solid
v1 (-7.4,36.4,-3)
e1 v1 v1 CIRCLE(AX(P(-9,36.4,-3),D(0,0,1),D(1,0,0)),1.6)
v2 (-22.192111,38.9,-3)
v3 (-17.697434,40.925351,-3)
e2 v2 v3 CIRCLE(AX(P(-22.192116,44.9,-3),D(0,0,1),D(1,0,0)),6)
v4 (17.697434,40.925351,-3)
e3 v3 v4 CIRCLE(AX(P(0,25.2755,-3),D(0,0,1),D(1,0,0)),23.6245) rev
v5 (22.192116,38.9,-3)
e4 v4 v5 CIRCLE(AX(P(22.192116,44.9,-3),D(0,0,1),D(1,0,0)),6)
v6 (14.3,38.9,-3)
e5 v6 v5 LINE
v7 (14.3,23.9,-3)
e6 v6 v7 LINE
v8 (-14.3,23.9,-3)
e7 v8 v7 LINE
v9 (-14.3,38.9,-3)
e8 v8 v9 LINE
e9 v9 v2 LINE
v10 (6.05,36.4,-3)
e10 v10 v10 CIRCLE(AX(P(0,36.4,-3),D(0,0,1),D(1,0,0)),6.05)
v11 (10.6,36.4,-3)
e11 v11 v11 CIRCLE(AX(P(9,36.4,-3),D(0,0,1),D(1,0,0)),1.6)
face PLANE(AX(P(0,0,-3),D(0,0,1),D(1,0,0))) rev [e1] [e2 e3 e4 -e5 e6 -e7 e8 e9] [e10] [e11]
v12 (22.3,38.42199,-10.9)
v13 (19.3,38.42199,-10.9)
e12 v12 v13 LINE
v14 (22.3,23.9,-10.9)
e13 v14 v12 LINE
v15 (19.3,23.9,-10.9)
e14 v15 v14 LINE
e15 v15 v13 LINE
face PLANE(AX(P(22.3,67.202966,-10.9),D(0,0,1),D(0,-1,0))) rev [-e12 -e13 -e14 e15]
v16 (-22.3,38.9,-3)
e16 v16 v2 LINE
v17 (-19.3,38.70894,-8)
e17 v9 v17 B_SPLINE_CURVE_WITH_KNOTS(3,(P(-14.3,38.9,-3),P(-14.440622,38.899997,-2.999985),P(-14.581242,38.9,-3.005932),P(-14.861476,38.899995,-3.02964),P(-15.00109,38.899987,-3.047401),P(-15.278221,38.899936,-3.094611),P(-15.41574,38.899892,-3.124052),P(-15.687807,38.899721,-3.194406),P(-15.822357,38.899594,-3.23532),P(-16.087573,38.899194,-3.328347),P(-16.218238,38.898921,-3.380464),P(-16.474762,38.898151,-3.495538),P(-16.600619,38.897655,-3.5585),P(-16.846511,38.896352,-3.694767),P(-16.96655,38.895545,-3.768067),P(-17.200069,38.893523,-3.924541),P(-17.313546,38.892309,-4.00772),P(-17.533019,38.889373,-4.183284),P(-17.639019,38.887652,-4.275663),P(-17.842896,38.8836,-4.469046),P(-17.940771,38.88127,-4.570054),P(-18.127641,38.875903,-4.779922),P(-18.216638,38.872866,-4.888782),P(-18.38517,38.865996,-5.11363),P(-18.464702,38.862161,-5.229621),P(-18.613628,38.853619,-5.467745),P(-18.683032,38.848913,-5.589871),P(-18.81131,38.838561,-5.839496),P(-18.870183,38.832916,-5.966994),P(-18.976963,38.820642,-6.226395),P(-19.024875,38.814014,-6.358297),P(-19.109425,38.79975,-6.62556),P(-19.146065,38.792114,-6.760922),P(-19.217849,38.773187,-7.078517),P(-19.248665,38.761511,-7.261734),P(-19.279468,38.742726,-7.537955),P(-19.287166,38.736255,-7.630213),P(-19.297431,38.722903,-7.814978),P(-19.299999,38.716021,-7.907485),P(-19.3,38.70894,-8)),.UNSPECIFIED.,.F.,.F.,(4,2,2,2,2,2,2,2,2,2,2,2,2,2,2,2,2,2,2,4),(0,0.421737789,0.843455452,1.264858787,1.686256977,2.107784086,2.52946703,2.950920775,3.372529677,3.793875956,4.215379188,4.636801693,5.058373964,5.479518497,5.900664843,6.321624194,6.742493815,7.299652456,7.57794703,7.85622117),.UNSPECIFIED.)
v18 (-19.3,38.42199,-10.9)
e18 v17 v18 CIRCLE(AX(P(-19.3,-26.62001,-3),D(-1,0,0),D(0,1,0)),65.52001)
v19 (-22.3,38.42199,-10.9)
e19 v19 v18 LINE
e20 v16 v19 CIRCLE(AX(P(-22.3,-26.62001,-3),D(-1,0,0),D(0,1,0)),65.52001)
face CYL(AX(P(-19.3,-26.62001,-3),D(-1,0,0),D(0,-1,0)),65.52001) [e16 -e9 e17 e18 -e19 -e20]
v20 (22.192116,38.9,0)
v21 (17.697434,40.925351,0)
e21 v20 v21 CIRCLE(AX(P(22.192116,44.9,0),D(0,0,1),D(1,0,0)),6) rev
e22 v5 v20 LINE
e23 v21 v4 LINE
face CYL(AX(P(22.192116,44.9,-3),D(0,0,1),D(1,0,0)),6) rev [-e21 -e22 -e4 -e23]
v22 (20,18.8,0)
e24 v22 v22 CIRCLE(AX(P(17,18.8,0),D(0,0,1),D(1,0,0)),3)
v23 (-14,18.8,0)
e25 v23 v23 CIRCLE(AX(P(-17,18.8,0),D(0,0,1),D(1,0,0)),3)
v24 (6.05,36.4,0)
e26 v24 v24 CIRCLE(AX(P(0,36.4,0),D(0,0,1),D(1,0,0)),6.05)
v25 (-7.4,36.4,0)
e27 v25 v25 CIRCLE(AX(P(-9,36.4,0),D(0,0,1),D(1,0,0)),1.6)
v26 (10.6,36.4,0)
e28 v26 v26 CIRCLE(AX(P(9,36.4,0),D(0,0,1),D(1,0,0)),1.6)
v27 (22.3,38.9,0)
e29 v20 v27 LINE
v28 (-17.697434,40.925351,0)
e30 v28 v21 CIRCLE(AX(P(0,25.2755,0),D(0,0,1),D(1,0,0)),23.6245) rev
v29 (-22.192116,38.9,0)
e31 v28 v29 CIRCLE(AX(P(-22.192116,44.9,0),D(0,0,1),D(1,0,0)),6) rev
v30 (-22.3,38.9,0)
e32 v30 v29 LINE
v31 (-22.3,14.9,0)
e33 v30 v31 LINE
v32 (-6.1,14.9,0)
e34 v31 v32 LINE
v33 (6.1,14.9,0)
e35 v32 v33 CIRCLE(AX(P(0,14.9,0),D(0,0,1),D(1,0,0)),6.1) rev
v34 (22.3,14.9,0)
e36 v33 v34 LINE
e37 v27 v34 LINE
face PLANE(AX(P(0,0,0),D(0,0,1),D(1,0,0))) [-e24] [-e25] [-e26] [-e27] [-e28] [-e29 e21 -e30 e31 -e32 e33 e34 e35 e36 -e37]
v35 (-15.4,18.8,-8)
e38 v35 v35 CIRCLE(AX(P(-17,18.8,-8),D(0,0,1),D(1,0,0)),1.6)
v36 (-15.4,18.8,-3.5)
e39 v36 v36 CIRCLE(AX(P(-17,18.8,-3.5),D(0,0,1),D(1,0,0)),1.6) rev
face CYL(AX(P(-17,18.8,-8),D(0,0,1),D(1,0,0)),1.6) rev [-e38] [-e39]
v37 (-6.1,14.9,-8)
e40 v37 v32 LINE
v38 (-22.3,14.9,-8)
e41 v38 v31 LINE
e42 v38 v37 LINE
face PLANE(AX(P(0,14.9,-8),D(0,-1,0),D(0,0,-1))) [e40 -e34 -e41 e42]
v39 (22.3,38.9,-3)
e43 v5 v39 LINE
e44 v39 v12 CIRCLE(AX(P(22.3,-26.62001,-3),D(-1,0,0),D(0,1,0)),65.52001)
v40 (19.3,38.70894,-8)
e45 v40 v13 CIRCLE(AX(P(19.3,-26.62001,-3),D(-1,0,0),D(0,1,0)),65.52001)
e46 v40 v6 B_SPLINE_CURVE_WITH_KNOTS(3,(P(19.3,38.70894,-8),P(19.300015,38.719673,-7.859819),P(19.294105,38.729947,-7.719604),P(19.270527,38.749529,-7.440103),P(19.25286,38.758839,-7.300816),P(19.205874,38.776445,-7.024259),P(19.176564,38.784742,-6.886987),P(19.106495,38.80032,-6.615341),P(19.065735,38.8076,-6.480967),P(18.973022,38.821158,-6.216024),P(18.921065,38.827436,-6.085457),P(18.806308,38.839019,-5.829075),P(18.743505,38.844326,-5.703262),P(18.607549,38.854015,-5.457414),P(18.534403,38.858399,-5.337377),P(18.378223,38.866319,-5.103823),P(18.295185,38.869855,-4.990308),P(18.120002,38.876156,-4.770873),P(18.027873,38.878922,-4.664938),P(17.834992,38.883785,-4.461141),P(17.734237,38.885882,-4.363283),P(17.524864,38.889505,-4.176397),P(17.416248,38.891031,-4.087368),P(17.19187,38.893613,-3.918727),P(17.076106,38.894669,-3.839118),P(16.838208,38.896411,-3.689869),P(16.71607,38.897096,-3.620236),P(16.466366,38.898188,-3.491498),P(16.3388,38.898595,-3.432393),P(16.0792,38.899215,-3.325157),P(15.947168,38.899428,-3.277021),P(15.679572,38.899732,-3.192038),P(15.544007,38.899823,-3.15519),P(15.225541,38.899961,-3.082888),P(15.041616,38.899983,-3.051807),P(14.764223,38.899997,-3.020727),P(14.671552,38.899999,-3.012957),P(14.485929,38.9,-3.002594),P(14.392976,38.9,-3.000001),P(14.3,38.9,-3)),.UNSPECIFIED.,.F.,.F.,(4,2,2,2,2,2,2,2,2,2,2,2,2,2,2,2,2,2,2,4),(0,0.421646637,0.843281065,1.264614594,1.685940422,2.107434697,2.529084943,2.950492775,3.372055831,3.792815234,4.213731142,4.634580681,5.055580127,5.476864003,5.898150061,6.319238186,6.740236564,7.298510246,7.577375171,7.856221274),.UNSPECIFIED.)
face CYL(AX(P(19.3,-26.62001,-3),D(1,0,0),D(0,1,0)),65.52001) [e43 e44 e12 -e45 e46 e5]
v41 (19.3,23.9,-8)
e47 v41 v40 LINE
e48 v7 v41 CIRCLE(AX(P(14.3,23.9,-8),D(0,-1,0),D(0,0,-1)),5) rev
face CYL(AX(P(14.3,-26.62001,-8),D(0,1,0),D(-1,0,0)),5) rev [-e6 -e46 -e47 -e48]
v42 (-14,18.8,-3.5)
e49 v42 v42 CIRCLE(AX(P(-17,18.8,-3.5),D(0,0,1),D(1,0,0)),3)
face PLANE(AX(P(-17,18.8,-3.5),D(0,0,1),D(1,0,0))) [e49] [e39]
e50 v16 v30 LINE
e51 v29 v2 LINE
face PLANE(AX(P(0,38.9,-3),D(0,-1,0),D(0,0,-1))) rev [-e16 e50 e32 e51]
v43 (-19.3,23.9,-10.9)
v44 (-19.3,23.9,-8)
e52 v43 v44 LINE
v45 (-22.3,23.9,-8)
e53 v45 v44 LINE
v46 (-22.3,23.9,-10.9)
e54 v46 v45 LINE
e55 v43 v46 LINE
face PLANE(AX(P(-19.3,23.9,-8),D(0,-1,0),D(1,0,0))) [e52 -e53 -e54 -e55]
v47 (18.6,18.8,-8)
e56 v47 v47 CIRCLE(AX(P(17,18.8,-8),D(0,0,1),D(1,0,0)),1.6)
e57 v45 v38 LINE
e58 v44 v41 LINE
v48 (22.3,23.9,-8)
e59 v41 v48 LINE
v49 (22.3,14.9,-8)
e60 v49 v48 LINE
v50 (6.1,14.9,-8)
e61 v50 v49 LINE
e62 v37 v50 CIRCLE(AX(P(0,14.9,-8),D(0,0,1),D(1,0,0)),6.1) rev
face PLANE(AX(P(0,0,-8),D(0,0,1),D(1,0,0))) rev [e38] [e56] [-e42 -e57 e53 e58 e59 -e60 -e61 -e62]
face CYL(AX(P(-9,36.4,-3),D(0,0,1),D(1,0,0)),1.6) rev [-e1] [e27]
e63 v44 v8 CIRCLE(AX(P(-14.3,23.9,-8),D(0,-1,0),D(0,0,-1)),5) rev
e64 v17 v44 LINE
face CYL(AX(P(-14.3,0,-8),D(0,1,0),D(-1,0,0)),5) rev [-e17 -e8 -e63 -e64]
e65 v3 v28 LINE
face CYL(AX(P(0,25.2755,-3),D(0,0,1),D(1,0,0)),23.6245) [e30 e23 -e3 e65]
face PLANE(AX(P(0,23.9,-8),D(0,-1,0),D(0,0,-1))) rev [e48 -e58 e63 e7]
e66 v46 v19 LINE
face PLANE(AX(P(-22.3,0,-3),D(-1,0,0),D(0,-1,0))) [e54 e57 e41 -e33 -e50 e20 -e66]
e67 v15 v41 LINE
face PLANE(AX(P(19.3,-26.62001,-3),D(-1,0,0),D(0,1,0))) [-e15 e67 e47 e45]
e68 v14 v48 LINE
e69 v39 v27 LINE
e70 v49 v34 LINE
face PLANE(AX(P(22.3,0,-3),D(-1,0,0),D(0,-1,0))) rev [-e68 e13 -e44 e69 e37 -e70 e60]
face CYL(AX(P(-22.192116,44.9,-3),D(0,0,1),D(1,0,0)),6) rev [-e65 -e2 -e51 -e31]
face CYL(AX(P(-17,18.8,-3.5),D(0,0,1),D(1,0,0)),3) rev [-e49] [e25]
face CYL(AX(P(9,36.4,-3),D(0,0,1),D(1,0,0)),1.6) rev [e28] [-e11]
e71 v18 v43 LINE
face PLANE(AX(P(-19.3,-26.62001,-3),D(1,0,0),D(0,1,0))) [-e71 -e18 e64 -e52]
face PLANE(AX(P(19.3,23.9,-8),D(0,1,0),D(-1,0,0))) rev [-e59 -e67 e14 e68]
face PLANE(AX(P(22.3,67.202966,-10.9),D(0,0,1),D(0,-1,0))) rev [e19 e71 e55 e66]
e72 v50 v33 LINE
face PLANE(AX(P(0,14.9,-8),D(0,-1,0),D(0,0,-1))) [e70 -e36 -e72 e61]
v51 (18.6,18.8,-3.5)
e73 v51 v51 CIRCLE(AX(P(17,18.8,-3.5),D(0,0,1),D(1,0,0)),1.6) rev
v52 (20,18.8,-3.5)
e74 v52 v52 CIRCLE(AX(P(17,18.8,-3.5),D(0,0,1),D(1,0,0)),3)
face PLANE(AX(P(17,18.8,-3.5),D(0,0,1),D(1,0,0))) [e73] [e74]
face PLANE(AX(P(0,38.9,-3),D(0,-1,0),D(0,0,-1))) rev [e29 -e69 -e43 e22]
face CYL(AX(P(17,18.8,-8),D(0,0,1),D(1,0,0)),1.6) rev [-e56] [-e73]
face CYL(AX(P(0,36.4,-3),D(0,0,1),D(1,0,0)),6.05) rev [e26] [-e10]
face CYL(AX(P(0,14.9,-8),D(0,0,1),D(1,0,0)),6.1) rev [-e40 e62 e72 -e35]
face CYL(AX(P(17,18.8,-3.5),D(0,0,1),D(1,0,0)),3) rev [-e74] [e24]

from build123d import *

# Parameters (mm, degrees)
SKETCH_2_R          = 6.05
SKETCH_2_R_2        = 1.6
EXTRUDE_1_DEPTH     = 3
SKETCH_2_3_R        = 1.6
EXTRUDE_2_DEPTH     = 8
SKETCH_3_R          = 1.65
EXTRUDE_4_DEPTH     = 3
SKETCH_5_R          = 3
CUT_EXTRUDE_1_DEPTH = 3.5
SKETCH_6_W          = 55.305281636
SKETCH_6_H          = 51.082077229
CUT_EXTRUDE_2_DEPTH = 82.174934555
FILLET_10_R         = 6
FILLET_11_R         = 5


with BuildPart() as part:
    # ｽｹｯﾁ2 → ﾎﾞｽ - 押し出し1 (new body)
    with BuildSketch(Plane.XY):
        with BuildLine():
            Line((-22.3, 23.9), (22.3, 23.9))
            Line((22.3, 23.9), (22.3, 38.9))
            Line((22.3, 38.9), (19.3, 38.9))
            ThreePointArc((19.3, 38.9), (0, 48.9), (-19.3, 38.9))
            Line((-19.3, 38.9), (-22.3, 38.9))
            Line((-22.3, 38.9), (-22.3, 23.9))
        make_face()
        with Locations((0, 36.4)):
            Circle(SKETCH_2_R, mode=Mode.SUBTRACT)
        with Locations((-9, 36.4)):
            Circle(SKETCH_2_R_2, mode=Mode.SUBTRACT)
        with Locations((9, 36.4)):
            Circle(SKETCH_2_R_2, mode=Mode.SUBTRACT)
    extrude(amount=-EXTRUDE_1_DEPTH)

    # ｽｹｯﾁ2<3> → ﾎﾞｽ - 押し出し2 (add)
    with BuildSketch(Plane.XY):
        with BuildLine():
            Line((22.3, 23.9), (-22.3, 23.9))
            Line((-22.3, 23.9), (-22.3, 14.9))
            Line((-22.3, 14.9), (-6.1, 14.9))
            ThreePointArc((-6.1, 14.9), (0, 21), (6.1, 14.9))
            Line((6.1, 14.9), (22.3, 14.9))
            Line((22.3, 14.9), (22.3, 23.9))
        make_face()
        with Locations((-17, 18.8)):
            Circle(SKETCH_2_3_R, mode=Mode.SUBTRACT)
        with Locations((17, 18.8)):
            Circle(SKETCH_2_3_R, mode=Mode.SUBTRACT)
    extrude(amount=-EXTRUDE_2_DEPTH)

    # ｽｹｯﾁ3 → ﾎﾞｽ - 押し出し4 (add)
    with BuildSketch(Plane.ZY.offset(22.3)):
        with BuildLine():
            Line((-8, 23.9), (-10.9, 23.9))
            Line((-10.9, 23.9), (-10.9, 16.120888862))
            Line((-10.9, 16.120888862), (-43, 16.120888862))
            ThreePointArc((-43, 16.120888862), (-46.752084661, 18.734576957), (-45.600779817, 23.159958513))
            ThreePointArc((-45.600779817, 23.159958513), (-25.707792424, 34.839146133), (-3, 38.9))
            Line((-3, 38.9), (-3, 23.9))
            Line((-3, 23.9), (-8, 23.9))
        make_face()
        with Locations(Location((-43, 20.120888862, 0), (0, 0, 270))):
            Circle(SKETCH_3_R, mode=Mode.SUBTRACT)
    extrude_4 = extrude(amount=-EXTRUDE_4_DEPTH)

    # ﾐﾗｰ11: ﾎﾞｽ - 押し出し4 across plane
    add(extrude_4.mirror(Plane(origin=(0, 0, 0), x_dir=(0, 0, 1), z_dir=(1, 0, 0))))

    # ｽｹｯﾁ5 → ｶｯﾄ - 押し出し1 (cut)
    with BuildSketch(Plane.XY):
        with Locations((-17, 18.8)):
            Circle(SKETCH_5_R)
        with Locations((17, 18.8)):
            Circle(SKETCH_5_R)
    extrude(amount=-CUT_EXTRUDE_1_DEPTH, mode=Mode.SUBTRACT)

    # ｽｹｯﾁ6 → ｶｯﾄ - 押し出し2 (cut, through all)
    with BuildSketch(Plane.ZY.offset(22.3)):
        with Locations((-38.552640818, 41.661927477)):
            Rectangle(SKETCH_6_W, SKETCH_6_H)
    extrude(amount=-CUT_EXTRUDE_2_DEPTH, mode=Mode.SUBTRACT)

    # ﾌｨﾚｯﾄ10
    # the kernel refuses this fillet: 6 mm, written as the material it adds along each edge
    with BuildSketch(Plane(origin=(19.3, 38.9, 0), x_dir=(-0.6205037663908469, 0.7842034658778125, 0), z_dir=(0, 0, -1))) as fillet_10_piece_1:
        with BuildLine():
            CenterArc((2.9106521, 5.991029767), FILLET_10_R, 218.352931503, 48.513653053)
            Line((-1.794568695, 2.268007169), (0, 0))
            ThreePointArc((0, 0), (1.29134257, 0.035319543), (2.582685141, 0))
        make_face()
    extrude(amount=3)
    with BuildSketch(Plane(origin=(-19.3, 38.9, 0), x_dir=(-1, 0, 0), z_dir=(0, 0, -1))) as fillet_10_piece_2:
        with BuildLine():
            CenterArc((2.892115717, 6), FILLET_10_R, 221.486346947, 48.513653053)
            ThreePointArc((-1.602565857, 2.025350639), (-0.77358522, 1.034591229), (0, 0))
            Line((0, 0), (2.892115717, 0))
        make_face()
    extrude(amount=3)

    # ﾌｨﾚｯﾄ11
    fillet_11_edges = [part.edges().sort_by_distance(p)[0] for p in [
        (19.3, 31.4, -3),
        (-19.3, 31.4, -3),
    ]]
    fillet(fillet_11_edges, radius=FILLET_11_R)


solid = part.part
